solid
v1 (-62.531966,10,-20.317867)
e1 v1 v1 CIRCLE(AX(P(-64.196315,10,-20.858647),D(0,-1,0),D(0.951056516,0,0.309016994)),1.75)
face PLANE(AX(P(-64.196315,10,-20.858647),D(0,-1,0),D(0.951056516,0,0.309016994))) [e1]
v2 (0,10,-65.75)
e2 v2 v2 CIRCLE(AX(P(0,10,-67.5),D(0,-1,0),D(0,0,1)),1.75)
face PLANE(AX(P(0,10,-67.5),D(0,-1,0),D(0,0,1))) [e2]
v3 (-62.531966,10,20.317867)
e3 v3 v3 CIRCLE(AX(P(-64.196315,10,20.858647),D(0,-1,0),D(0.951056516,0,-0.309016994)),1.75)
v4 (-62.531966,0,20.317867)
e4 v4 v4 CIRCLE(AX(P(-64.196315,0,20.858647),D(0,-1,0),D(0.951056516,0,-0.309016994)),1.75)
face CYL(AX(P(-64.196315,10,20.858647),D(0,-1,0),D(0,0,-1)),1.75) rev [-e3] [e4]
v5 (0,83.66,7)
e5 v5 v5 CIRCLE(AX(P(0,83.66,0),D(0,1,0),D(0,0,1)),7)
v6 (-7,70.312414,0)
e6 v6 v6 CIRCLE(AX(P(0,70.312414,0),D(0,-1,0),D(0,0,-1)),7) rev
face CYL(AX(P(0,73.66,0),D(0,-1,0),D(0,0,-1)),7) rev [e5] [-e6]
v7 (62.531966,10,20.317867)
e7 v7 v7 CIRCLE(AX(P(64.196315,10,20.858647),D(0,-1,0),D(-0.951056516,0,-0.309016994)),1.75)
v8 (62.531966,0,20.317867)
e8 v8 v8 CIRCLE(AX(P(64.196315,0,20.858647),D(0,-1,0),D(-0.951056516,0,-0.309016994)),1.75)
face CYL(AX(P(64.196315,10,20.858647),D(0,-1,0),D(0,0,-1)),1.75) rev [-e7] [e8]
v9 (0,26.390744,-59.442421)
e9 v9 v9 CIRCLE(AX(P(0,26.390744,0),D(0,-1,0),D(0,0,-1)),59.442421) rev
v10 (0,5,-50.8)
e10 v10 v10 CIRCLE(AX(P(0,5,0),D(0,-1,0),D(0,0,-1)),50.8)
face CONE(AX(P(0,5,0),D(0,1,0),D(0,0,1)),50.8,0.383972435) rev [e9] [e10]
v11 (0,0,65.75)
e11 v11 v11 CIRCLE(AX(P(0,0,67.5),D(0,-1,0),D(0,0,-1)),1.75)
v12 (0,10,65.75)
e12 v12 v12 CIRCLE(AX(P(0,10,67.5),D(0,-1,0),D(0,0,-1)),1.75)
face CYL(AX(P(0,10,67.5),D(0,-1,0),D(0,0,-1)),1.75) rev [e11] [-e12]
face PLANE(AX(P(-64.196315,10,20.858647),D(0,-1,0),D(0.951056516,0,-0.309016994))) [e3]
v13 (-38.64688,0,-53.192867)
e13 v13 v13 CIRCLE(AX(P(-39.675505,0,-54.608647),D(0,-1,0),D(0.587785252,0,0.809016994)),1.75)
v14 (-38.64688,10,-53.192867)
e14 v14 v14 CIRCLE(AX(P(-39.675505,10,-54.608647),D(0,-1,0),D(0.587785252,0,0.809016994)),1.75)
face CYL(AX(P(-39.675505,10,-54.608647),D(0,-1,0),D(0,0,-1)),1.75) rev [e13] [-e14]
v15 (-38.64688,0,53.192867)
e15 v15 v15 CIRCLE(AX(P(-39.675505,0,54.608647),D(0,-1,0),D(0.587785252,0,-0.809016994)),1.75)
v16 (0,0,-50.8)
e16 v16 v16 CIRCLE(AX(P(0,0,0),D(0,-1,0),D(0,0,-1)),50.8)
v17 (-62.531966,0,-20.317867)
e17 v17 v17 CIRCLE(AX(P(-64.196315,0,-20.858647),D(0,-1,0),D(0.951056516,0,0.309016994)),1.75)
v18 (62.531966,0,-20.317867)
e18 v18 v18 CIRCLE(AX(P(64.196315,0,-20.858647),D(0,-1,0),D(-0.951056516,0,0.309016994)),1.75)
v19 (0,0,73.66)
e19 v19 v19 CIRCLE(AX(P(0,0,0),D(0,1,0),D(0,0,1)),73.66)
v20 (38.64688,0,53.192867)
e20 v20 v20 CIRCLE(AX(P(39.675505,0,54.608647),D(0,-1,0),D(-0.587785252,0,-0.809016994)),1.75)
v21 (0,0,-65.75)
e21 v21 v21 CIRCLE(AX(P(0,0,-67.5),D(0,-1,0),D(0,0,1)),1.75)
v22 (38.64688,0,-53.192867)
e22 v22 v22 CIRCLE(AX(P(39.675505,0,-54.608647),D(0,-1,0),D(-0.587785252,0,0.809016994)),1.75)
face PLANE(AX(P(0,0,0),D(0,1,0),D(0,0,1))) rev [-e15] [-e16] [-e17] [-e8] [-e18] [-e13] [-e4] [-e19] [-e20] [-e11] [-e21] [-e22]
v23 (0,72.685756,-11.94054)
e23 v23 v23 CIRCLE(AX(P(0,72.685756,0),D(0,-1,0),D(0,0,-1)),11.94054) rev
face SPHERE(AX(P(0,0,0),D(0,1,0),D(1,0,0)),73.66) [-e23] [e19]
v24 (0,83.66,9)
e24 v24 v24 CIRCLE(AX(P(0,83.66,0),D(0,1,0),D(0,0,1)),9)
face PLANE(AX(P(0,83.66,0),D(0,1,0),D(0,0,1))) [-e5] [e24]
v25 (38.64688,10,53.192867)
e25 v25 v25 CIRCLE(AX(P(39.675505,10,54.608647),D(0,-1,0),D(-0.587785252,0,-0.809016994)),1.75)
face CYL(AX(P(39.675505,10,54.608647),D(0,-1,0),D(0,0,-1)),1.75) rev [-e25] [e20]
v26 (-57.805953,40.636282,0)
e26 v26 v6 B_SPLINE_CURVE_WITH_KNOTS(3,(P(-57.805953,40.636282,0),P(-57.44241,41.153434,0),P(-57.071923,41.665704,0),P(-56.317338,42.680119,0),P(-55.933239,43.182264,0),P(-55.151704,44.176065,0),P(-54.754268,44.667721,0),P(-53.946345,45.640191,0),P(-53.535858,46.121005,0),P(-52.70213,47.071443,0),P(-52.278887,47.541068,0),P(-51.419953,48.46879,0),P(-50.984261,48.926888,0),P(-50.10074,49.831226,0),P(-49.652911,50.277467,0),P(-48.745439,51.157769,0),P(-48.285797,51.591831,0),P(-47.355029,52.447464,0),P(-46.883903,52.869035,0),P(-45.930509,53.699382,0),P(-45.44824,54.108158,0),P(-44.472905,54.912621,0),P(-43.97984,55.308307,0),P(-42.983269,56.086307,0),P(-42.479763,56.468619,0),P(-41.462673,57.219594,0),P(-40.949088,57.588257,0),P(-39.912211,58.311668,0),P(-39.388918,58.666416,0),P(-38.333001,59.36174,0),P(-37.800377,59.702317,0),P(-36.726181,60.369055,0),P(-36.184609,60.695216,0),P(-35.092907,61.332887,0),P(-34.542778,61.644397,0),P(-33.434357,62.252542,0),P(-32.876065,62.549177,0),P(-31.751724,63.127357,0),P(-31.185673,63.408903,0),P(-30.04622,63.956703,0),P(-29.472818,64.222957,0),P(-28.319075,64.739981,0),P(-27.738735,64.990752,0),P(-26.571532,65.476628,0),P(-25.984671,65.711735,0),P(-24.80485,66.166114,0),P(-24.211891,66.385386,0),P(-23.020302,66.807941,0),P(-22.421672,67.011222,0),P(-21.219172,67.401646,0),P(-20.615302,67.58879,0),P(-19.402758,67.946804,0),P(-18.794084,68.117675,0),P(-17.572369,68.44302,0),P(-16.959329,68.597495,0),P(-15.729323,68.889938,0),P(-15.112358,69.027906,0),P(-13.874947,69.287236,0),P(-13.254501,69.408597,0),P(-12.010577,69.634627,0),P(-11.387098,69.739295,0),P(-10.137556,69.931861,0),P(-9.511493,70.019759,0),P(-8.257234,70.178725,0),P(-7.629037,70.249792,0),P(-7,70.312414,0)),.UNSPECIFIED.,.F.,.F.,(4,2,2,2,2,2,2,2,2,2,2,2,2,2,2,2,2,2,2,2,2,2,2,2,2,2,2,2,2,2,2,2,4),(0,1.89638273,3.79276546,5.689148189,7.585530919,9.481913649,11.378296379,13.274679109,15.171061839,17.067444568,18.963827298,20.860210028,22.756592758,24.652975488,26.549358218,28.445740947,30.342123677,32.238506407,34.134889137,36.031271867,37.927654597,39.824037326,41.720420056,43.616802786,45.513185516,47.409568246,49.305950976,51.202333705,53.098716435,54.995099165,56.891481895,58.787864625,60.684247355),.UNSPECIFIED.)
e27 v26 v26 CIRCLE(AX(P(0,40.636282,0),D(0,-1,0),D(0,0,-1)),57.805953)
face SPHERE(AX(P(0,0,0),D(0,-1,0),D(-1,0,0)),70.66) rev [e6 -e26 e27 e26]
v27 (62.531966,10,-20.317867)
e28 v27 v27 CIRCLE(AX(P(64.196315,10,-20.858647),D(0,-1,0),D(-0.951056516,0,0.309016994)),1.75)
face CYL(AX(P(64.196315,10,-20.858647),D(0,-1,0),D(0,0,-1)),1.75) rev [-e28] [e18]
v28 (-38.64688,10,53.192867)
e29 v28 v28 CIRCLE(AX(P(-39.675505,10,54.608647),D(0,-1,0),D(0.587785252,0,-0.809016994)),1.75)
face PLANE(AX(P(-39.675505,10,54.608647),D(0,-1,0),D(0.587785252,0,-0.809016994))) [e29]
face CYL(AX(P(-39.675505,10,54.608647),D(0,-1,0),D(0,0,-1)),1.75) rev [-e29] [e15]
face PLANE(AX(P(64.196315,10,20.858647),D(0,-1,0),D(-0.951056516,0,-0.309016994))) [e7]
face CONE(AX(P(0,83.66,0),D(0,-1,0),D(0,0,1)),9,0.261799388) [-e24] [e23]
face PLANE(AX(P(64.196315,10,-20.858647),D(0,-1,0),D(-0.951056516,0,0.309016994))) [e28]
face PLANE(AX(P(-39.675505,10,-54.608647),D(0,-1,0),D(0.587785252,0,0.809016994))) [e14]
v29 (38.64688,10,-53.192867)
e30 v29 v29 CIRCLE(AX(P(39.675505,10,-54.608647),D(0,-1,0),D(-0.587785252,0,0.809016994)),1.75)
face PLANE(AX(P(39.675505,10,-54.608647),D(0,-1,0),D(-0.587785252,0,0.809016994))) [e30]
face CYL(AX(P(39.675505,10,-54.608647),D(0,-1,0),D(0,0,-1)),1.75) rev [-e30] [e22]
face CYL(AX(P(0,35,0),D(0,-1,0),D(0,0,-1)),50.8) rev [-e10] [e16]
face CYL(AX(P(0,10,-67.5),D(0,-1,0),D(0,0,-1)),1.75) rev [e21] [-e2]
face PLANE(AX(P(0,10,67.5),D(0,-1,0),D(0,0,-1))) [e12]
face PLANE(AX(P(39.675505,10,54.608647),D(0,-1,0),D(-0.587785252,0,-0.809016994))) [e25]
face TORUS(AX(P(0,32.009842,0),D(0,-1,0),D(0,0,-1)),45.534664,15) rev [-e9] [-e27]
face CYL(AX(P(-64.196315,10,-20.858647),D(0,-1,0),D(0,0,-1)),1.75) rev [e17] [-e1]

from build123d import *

# Parameters (mm, degrees)
SKETCH3_R                = 50.8
CUT_EXTRUDE1_DEPTH       = 35
FILLET1_R                = 15
SKETCH5_R                = 7
GSM_ANTENNA_DEPTH        = 133.362935901
SKETCH9_R                = 1.75
CUT_EXTRUDE6_DEPTH       = 10
CIRPATTERN1_COUNT        = 10
BOSS_EXTRUDE2_REACH      = 135.606
BOSS_EXTRUDE2_END_RADIUS = 73.66
SKETCH13_R               = 9
SKETCH13_R_2             = 7
DRAFT2_ANGLE             = 15


with BuildPart() as part:
    # Sketch2 → Dome (revolve)
    with BuildSketch(Plane.XY):
        with BuildLine():
            Line((0, 73.66), (0, 0))
            Line((0, 0), (73.66, 0))
            ThreePointArc((73.66, 0), (52.085485502, 52.085485502), (0, 73.66))
        make_face()
    revolve(axis=Axis((0, 73.66, 0), (0, -1, 0)))

    # Sketch3 → Cut-Extrude1 (cut)
    with BuildSketch(Plane.XZ):
        Circle(SKETCH3_R)
    extrude(amount=-CUT_EXTRUDE1_DEPTH, mode=Mode.SUBTRACT)

    # Sketch4 → Wall Shape (revolve, cut)
    with BuildSketch(Plane.XY):
        with BuildLine():
            Line((-50.8, 5), (-50.8, 0))
            Line((-50.8, 0), (0, 0))
            Line((0, 0), (0, 70.66))
            ThreePointArc((0, 70.66), (-36.285571477, 60.631616361), (-62.271521348, 33.393011678))
            Line((-62.271521348, 33.393011678), (-50.8, 5))
        make_face()
    revolve(axis=Axis((0, 0, 0), (0, 1, 0)), mode=Mode.SUBTRACT)

    # Fillet1
    fillet1_edges = [part.edges().sort_by_distance(p)[0] for p in [
        (62.271521348, 33.393011678, 0),
    ]]
    fillet(fillet1_edges, radius=FILLET1_R)

    # Sketch5 → GSM Antenna (cut, through all)
    with BuildSketch(Plane(origin=(0, -8.000000002, 0), x_dir=(1, 0, 0), z_dir=(0, 1, 0))):
        Circle(SKETCH5_R)
    extrude(amount=GSM_ANTENNA_DEPTH, mode=Mode.SUBTRACT)

    # Sketch9 → Cut-Extrude6 (cut)
    with BuildSketch(Plane(origin=(0, 0, 0), x_dir=(-1, 0, 0), z_dir=(0, -1, 0))):
        with Locations((0, -67.5)):
            Circle(SKETCH9_R)
    cut_extrude6 = extrude(amount=-CUT_EXTRUDE6_DEPTH, mode=Mode.SUBTRACT)

    # CirPattern1: Cut-Extrude6 ×10 about axis
    cirpattern1_axis = Axis((0, 35, 0), (0, -1, 0))
    for i in range(1, CIRPATTERN1_COUNT):
        add(cut_extrude6.rotate(cirpattern1_axis, i * 360 / CIRPATTERN1_COUNT), mode=Mode.SUBTRACT)

    # Boss-Extrude2: up to this sphere (the profile starts outside it)
    boss_extrude2_end = Location((0, 0, 0)) * Sphere(BOSS_EXTRUDE2_END_RADIUS, mode=Mode.PRIVATE)
    # Sketch13 → Boss-Extrude2 (add, up to the surface)
    with BuildSketch(Plane(origin=(0, 83.66, 0), x_dir=(1, 0, 0), z_dir=(0, 1, 0)), mode=Mode.PRIVATE) as boss_extrude2_sk1:
        Circle(SKETCH13_R)
        Circle(SKETCH13_R_2, mode=Mode.SUBTRACT)
    boss_extrude2_tool1 = extrude(boss_extrude2_sk1.sketch, amount=-BOSS_EXTRUDE2_REACH, mode=Mode.PRIVATE) - boss_extrude2_end
    add(boss_extrude2_tool1.solids().sort_by_distance((-8.745442, 83.66, 0))[0])

    # Draft2
    draft2_faces = [part.faces().sort_by_distance(p)[0] for p in [
        (-9, 78.384054495, 0),
    ]]
    draft(draft2_faces, Plane.ZX.offset(83.66), DRAFT2_ANGLE)


solid = part.part
